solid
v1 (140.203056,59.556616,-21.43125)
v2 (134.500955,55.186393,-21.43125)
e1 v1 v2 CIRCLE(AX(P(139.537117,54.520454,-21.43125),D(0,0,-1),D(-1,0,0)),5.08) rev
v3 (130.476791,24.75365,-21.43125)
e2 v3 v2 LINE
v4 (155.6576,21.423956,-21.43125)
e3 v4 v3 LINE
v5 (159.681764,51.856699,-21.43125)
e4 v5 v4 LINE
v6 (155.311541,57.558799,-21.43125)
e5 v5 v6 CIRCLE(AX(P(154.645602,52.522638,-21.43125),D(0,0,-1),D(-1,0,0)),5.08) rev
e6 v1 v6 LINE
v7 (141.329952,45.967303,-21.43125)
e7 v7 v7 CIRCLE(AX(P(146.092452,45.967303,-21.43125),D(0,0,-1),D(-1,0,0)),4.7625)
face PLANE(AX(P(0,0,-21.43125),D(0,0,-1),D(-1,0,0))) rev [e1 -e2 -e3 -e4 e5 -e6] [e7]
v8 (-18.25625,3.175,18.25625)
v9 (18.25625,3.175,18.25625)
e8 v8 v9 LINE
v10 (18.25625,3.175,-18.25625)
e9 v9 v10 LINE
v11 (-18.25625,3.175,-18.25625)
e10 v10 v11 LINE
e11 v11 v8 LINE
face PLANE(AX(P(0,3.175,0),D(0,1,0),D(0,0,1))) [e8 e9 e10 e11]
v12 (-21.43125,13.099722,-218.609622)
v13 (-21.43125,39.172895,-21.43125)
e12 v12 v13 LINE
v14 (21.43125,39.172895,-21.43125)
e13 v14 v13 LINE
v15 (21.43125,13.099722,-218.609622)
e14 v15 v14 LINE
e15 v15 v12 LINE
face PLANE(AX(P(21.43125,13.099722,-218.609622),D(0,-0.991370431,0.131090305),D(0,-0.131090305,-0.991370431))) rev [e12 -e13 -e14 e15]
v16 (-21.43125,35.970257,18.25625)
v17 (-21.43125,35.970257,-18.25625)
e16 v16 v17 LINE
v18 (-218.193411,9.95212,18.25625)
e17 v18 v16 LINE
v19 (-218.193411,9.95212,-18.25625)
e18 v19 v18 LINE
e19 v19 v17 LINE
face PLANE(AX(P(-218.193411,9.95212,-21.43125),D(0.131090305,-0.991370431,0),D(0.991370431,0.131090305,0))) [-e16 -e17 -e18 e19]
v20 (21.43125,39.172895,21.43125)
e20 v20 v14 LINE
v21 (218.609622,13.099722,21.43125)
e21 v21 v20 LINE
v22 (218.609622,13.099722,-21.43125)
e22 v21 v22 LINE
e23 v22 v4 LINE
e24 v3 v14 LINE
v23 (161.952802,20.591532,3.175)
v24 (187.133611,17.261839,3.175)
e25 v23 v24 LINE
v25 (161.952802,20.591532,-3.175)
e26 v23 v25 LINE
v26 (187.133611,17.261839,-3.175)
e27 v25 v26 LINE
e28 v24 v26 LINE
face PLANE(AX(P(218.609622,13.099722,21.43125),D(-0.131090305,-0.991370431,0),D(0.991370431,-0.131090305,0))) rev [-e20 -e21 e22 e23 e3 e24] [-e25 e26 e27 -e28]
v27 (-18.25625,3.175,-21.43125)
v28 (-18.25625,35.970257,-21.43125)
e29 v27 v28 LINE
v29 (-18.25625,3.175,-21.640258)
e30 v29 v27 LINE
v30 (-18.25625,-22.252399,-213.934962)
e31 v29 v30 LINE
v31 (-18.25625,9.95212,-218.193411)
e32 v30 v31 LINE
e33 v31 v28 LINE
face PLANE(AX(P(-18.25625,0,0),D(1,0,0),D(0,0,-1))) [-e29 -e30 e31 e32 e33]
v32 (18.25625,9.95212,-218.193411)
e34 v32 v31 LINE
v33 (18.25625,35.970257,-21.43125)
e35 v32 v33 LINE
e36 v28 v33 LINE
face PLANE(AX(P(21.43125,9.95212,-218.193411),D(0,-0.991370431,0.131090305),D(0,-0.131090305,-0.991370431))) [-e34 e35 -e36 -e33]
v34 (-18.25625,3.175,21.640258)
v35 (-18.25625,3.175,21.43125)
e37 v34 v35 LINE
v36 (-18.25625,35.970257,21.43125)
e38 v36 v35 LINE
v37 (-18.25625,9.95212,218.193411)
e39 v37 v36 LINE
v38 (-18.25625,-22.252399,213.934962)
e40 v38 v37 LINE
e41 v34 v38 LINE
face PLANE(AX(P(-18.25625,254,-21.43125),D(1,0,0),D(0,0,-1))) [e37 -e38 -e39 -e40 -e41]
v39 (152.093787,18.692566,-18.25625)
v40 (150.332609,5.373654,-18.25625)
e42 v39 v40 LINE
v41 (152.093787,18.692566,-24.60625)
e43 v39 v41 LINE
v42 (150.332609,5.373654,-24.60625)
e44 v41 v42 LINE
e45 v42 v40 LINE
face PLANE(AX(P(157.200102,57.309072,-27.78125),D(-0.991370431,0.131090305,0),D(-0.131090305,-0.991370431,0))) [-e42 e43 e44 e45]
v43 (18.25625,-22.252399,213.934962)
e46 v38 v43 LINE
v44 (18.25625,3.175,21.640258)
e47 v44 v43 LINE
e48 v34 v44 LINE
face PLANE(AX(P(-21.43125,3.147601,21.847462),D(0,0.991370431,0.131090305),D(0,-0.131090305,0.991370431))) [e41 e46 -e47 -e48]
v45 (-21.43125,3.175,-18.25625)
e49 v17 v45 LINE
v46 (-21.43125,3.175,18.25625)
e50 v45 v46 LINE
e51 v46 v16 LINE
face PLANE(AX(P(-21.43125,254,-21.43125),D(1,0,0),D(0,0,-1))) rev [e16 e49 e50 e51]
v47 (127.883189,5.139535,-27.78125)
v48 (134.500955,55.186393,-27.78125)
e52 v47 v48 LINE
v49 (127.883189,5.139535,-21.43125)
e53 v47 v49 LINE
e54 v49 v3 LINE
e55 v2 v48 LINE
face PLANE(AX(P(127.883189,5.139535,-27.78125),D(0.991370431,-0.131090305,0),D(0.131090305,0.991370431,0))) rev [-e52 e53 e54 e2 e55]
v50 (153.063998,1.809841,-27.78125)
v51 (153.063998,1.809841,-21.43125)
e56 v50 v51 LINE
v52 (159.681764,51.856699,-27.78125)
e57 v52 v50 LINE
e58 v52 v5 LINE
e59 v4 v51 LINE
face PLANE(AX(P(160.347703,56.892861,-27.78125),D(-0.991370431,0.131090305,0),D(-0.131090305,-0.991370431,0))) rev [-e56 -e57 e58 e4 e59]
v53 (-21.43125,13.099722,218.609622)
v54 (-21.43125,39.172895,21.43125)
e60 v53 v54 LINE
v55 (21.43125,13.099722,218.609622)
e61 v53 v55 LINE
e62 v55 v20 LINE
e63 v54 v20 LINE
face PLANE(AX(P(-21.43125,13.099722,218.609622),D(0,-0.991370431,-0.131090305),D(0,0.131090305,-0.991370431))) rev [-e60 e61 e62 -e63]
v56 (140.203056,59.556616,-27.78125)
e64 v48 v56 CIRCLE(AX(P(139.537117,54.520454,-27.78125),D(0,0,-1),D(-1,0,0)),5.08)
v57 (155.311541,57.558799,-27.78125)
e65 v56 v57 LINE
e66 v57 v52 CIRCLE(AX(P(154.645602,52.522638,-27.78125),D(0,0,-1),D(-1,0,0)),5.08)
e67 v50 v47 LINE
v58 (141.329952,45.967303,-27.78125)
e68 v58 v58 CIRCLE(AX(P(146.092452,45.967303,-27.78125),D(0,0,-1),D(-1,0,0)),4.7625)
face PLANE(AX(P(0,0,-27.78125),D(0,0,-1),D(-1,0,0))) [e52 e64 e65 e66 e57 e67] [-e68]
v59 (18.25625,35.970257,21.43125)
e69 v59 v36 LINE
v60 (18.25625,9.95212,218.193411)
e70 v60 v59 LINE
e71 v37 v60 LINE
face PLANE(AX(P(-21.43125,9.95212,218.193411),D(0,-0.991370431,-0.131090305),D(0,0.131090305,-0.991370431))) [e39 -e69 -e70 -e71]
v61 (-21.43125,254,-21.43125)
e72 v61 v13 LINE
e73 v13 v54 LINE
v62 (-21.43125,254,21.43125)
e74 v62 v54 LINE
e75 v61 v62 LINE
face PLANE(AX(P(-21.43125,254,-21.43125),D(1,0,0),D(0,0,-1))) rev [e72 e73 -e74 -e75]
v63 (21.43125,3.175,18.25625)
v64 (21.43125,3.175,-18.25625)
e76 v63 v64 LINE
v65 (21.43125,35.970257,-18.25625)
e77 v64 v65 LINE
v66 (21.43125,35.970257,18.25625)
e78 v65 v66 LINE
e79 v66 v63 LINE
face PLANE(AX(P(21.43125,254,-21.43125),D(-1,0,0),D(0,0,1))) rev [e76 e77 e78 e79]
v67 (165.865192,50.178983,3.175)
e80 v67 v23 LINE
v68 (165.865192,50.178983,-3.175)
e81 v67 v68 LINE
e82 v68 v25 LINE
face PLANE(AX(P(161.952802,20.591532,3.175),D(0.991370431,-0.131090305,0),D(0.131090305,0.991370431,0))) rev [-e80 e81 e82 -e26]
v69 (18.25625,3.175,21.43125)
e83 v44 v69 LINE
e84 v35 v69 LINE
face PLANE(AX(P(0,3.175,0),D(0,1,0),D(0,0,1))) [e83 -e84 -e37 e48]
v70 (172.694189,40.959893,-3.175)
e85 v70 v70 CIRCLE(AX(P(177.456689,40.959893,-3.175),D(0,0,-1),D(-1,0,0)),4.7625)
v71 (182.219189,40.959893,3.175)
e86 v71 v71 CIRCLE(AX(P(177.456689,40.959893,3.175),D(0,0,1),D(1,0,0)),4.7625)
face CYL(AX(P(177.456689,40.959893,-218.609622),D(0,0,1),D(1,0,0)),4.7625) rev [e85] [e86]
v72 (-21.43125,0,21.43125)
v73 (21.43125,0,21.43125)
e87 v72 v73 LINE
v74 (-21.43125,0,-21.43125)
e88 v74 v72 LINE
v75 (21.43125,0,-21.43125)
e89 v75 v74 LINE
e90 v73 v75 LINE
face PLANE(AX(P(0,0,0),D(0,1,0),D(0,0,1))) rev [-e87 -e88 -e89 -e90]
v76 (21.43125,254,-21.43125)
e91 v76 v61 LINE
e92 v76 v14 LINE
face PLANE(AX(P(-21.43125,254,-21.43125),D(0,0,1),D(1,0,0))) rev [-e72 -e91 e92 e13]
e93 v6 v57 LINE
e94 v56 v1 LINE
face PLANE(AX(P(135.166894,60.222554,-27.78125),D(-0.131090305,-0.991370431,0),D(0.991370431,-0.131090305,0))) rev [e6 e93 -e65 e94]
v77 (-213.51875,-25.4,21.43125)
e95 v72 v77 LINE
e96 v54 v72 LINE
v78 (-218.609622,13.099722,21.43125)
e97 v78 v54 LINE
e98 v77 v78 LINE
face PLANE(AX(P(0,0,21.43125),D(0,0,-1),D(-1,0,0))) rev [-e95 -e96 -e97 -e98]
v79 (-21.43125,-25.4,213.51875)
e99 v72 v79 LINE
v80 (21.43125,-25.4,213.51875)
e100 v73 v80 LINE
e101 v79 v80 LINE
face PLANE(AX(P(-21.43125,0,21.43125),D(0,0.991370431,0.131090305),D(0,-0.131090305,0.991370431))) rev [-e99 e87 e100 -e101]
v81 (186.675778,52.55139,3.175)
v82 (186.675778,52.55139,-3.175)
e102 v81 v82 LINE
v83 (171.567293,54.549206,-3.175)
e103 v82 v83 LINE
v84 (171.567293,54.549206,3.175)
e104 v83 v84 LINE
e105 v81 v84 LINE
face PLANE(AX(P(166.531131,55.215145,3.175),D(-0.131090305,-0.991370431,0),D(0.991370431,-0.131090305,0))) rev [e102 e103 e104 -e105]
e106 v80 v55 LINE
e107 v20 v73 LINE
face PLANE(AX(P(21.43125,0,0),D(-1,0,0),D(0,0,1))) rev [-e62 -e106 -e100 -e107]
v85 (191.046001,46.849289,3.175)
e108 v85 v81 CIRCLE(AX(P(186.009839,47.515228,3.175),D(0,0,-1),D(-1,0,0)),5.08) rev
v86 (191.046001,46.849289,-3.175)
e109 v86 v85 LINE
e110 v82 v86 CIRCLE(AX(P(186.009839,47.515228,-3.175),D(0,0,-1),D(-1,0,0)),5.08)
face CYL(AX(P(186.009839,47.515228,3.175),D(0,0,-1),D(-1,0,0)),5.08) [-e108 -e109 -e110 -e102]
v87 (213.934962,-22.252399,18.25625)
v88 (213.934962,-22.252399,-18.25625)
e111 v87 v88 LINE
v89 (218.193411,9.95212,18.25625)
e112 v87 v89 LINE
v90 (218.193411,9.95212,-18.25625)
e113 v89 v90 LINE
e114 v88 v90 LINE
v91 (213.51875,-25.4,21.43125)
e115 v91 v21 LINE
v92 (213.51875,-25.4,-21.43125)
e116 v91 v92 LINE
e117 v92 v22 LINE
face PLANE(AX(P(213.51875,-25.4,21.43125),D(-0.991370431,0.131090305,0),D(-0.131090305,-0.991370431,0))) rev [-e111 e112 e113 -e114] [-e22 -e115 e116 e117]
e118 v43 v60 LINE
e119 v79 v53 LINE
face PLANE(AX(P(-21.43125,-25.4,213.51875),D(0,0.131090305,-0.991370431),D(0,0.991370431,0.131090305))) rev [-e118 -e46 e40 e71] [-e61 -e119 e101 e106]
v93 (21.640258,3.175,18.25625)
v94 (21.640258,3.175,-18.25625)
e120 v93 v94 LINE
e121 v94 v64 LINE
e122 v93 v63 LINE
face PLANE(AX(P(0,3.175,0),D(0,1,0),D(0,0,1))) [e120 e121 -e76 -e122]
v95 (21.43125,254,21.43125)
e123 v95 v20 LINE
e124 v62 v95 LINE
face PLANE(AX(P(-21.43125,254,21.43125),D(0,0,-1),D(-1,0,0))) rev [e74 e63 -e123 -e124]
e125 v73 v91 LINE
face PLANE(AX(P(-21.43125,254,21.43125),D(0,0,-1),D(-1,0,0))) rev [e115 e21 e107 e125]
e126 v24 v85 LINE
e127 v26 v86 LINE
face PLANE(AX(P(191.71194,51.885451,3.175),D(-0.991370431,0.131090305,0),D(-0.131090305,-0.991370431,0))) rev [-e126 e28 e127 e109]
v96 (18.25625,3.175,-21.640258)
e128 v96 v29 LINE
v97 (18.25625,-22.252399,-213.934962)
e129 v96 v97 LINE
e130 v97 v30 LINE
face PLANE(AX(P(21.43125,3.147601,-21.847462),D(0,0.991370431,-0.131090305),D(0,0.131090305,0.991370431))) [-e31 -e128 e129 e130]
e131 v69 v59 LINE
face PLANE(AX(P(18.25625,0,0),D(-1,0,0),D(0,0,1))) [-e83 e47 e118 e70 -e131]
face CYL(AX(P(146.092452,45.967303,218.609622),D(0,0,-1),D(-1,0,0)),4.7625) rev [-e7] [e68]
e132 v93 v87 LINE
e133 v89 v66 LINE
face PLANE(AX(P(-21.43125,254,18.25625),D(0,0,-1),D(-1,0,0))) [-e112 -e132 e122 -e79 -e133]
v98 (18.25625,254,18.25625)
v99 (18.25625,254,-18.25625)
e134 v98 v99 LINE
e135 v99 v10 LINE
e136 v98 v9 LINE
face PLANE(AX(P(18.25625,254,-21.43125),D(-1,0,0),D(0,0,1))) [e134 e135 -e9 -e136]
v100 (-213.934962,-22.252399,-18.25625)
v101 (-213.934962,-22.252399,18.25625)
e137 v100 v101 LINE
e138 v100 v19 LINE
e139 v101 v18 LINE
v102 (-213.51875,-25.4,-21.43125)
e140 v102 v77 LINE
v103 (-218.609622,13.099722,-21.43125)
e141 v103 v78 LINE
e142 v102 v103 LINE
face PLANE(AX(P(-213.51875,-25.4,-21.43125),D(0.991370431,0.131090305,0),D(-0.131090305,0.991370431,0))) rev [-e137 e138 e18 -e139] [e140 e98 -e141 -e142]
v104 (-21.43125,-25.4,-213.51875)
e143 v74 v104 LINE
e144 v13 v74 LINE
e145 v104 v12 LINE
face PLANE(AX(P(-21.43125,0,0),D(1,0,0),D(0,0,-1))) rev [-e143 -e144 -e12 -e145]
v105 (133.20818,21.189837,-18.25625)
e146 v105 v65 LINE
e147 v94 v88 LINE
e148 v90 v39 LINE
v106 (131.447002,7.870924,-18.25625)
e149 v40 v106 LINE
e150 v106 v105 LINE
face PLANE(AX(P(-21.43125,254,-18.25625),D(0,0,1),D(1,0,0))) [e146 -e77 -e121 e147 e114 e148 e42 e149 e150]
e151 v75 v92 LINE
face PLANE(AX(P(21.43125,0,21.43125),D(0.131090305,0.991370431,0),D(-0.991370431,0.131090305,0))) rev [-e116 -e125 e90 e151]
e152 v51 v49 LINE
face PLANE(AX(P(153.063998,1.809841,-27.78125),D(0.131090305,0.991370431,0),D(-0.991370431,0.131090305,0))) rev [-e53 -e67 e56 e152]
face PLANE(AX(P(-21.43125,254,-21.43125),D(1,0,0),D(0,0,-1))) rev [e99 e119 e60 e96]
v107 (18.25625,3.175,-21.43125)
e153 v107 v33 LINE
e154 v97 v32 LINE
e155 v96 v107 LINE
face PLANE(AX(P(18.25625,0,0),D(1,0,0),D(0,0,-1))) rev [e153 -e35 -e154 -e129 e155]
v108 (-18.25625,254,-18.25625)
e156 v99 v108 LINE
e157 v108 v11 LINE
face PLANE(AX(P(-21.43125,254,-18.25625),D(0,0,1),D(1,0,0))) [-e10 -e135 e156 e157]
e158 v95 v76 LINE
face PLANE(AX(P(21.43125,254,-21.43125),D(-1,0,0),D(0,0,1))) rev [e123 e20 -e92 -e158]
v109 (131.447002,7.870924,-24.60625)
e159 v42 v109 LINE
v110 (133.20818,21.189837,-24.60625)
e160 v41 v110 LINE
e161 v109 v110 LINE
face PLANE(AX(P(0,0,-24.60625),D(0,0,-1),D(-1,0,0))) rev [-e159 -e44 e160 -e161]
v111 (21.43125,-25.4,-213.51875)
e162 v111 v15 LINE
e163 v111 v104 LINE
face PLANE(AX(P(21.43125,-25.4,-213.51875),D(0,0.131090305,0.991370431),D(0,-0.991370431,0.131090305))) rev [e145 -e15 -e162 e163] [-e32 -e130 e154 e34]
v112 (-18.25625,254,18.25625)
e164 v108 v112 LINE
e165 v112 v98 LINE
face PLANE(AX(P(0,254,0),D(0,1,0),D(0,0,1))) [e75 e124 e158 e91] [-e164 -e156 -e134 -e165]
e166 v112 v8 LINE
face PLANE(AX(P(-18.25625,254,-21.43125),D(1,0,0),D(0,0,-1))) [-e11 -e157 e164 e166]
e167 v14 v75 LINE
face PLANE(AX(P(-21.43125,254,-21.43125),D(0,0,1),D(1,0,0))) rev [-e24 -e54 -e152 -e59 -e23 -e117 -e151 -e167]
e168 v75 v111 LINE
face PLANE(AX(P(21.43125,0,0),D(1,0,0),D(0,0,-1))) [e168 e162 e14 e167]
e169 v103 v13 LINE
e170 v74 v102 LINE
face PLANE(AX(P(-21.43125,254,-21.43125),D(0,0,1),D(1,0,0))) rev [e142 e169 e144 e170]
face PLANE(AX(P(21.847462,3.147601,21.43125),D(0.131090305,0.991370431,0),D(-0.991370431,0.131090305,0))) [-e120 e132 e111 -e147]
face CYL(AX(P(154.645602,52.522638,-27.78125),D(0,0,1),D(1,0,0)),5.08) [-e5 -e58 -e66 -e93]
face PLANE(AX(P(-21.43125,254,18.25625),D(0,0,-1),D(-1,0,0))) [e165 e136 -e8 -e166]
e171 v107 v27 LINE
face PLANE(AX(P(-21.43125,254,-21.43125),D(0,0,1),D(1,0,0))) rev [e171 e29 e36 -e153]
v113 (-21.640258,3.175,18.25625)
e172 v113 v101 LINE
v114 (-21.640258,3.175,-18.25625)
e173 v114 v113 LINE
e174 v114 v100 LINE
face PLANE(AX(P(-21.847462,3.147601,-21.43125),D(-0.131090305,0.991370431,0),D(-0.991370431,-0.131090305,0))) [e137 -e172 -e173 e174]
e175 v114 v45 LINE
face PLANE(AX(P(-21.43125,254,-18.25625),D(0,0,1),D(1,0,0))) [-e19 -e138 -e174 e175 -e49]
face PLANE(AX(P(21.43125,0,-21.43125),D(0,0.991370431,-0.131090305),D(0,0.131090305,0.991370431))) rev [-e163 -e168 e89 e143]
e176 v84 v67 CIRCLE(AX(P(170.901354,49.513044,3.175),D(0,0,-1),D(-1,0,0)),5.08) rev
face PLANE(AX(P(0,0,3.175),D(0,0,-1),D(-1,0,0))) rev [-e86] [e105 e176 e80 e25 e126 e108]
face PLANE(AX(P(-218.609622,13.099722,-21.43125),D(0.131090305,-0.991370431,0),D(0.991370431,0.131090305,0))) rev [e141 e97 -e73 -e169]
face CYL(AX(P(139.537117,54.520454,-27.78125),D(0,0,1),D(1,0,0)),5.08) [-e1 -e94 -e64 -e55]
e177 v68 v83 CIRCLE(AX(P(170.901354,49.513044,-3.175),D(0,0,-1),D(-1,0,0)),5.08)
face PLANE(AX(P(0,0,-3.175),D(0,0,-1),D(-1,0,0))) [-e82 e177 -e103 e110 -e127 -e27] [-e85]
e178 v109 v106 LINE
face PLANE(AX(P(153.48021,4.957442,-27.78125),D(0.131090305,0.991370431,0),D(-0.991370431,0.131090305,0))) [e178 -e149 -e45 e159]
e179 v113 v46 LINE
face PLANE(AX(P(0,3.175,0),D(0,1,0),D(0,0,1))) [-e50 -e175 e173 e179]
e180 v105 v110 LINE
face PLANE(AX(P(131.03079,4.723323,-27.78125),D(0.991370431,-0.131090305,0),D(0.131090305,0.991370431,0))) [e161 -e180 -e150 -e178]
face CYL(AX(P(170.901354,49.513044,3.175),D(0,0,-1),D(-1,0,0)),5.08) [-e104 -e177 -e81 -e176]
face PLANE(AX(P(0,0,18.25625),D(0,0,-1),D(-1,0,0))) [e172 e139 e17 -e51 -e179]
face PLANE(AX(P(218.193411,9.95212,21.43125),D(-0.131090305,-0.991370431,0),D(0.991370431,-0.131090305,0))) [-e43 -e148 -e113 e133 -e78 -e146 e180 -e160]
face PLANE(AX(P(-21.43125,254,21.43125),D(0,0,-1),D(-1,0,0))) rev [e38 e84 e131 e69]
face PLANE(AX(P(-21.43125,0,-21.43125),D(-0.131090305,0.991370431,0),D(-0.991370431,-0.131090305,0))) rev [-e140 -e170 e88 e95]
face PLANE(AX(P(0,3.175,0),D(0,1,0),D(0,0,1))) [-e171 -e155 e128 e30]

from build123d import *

# Parameters (mm, degrees)
SKETCH1_W           = 42.8625
SKETCH1_H           = 42.8625
BOSS_EXTRUDE1_DEPTH = 254
SHELL1_T            = -3.175
BOSS_EXTRUDE2_DEPTH = 21.43125
CIRPATTERN1_START   = -21.43125
CIRPATTERN1_DEPTH   = 42.8625
CIRPATTERN1_2_DEPTH = 42.8625
BOSS_EXTRUDE3_DEPTH = 6.35
SKETCH4_R           = 4.7625
CUT_EXTRUDE1_DEPTH  = 416.95027213
BOSS_EXTRUDE4_DEPTH = 3.175
SKETCH6_R           = 4.7625
CUT_EXTRUDE2_DEPTH  = 402.863889424
FILLET1_R           = 5.08
SHELL3_START        = -18.25625
SHELL3_DEPTH        = 36.5125
SHELL3_2_DEPTH      = 36.5125
SHELL3_START_2      = -24.60625
SHELL3_3_DEPTH      = 6.35


with BuildPart() as part:
    # Sketch1 → Boss-Extrude1 (new body)
    with BuildSketch(Plane(origin=(0, 0, 0), x_dir=(1, 0, 0), z_dir=(0, 1, 0))):
        Rectangle(SKETCH1_W, SKETCH1_H)
    extrude(amount=BOSS_EXTRUDE1_DEPTH)

    # Shell1
    shell1_openings = [part.faces().sort_by_distance(p)[0] for p in [
        (0, 254, 0),
    ]]
    offset(amount=SHELL1_T, openings=shell1_openings, kind=Kind.INTERSECTION)

    # Sketch2 → Boss-Extrude2 (add, symmetric)
    with BuildSketch(Plane.XY):
        Polygon((21.43125, 0), (213.51875, -25.4), (218.609622268, 13.099721526), (21.43125, 39.172894719), align=None)
    extrude(amount=BOSS_EXTRUDE2_DEPTH, both=True)

    # CirPattern1: read off the stored shape, not the designer's step
    # CirPattern1 outline → CirPattern1 (add)
    with BuildSketch(Plane.YZ.offset(CIRPATTERN1_START)):
        Polygon((13.099721526, -218.609622268), (39.172894719, -21.43125), (0, -21.43125), (-25.4, -213.51875), align=None)
        Polygon((-25.4, 213.51875), (0, 21.43125), (39.172894719, 21.43125), (13.099721526, 218.609622268), align=None)
    extrude(amount=CIRPATTERN1_DEPTH)

    # CirPattern1 2 outline → CirPattern1 2 (add)
    with BuildSketch(Plane.XY.offset(CIRPATTERN1_START)):
        Polygon((-213.51875, -25.4), (-21.43125, 0), (-21.43125, 39.172894719), (-218.609622268, 13.099721526), align=None)
    extrude(amount=CIRPATTERN1_2_DEPTH)

    # Sketch3 → Boss-Extrude3 (add)
    with BuildSketch(Plane(origin=(0, 0, -21.43125), x_dir=(-1, 0, 0), z_dir=(0, 0, -1))):
        Polygon((-153.063997925, 1.80984108), (-127.883188972, 5.139534826), (-135.166894041, 60.222554412), (-160.347702995, 56.892860666), align=None)
    extrude(amount=BOSS_EXTRUDE3_DEPTH)

    # Sketch4 → Cut-Extrude1 (cut, through all)
    with BuildSketch(Plane(origin=(0, 0, -27.78125), x_dir=(-1, 0, 0), z_dir=(0, 0, -1))):
        with Locations((-146.092451645, 45.967303062)):
            Circle(SKETCH4_R)
    extrude(amount=-CUT_EXTRUDE1_DEPTH, mode=Mode.SUBTRACT)

    # Sketch5 → Boss-Extrude4 (add, symmetric)
    with BuildSketch(Plane.XY):
        Polygon((161.952802122, 20.591532454), (166.531131023, 55.215144766), (191.711939977, 51.88545102), (187.133611076, 17.261838709), align=None)
    extrude(amount=BOSS_EXTRUDE4_DEPTH, both=True)

    # Sketch6 → Cut-Extrude2 (cut, through all)
    with BuildSketch(Plane.XY.offset(3.175)):
        with Locations((177.456688627, 40.959893416)):
            Circle(SKETCH6_R)
    extrude(amount=-CUT_EXTRUDE2_DEPTH, mode=Mode.SUBTRACT)

    # Fillet1
    fillet1_edges = [part.edges().sort_by_distance(p)[0] for p in [
        (160.347702995, 56.892860666, -24.60625),
        (135.166894041, 60.222554412, -24.60625),
        (191.711939977, 51.88545102, 0),
        (166.531131023, 55.215144766, 0),
    ]]
    fillet(fillet1_edges, radius=FILLET1_R)

    # Shell3: read off the stored shape, not the designer's step
    # Shell3 outline → Shell3 (cut)
    with BuildSketch(Plane.YZ.offset(SHELL3_START)):
        Polygon((9.952120407, -218.19341055), (35.970257339, -21.43125), (3.175, -21.43125), (3.175, -21.640257682), (-22.252398881, -213.934961718), align=None)
        Polygon((3.175, 21.640257682), (3.175, 21.43125), (35.970257339, 21.43125), (9.952120407, 218.19341055), (-22.252398881, 213.934961718), align=None)
    extrude(amount=SHELL3_DEPTH, mode=Mode.SUBTRACT)

    # Shell3 2 outline → Shell3 2 (cut)
    with BuildSketch(Plane.XY.offset(SHELL3_START)):
        Polygon((-21.640257682, 3.175), (-21.43125, 3.175), (-21.43125, 35.970257339), (-218.19341055, 9.952120407), (-213.934961718, -22.252398881), align=None)
        Polygon((21.43125, 35.970257339), (21.43125, 3.175), (21.640257682, 3.175), (213.934961718, -22.252398881), (218.19341055, 9.952120407), align=None)
    extrude(amount=SHELL3_2_DEPTH, mode=Mode.SUBTRACT)

    # Shell3 3 outline → Shell3 3 (cut)
    with BuildSketch(Plane.XY.offset(SHELL3_START_2)):
        Polygon((152.093787046, 18.69256649), (133.208180331, 21.189836799), (131.447001809, 7.870924227), (150.332608524, 5.373653917), align=None)
    extrude(amount=SHELL3_3_DEPTH, mode=Mode.SUBTRACT)


solid = part.part
